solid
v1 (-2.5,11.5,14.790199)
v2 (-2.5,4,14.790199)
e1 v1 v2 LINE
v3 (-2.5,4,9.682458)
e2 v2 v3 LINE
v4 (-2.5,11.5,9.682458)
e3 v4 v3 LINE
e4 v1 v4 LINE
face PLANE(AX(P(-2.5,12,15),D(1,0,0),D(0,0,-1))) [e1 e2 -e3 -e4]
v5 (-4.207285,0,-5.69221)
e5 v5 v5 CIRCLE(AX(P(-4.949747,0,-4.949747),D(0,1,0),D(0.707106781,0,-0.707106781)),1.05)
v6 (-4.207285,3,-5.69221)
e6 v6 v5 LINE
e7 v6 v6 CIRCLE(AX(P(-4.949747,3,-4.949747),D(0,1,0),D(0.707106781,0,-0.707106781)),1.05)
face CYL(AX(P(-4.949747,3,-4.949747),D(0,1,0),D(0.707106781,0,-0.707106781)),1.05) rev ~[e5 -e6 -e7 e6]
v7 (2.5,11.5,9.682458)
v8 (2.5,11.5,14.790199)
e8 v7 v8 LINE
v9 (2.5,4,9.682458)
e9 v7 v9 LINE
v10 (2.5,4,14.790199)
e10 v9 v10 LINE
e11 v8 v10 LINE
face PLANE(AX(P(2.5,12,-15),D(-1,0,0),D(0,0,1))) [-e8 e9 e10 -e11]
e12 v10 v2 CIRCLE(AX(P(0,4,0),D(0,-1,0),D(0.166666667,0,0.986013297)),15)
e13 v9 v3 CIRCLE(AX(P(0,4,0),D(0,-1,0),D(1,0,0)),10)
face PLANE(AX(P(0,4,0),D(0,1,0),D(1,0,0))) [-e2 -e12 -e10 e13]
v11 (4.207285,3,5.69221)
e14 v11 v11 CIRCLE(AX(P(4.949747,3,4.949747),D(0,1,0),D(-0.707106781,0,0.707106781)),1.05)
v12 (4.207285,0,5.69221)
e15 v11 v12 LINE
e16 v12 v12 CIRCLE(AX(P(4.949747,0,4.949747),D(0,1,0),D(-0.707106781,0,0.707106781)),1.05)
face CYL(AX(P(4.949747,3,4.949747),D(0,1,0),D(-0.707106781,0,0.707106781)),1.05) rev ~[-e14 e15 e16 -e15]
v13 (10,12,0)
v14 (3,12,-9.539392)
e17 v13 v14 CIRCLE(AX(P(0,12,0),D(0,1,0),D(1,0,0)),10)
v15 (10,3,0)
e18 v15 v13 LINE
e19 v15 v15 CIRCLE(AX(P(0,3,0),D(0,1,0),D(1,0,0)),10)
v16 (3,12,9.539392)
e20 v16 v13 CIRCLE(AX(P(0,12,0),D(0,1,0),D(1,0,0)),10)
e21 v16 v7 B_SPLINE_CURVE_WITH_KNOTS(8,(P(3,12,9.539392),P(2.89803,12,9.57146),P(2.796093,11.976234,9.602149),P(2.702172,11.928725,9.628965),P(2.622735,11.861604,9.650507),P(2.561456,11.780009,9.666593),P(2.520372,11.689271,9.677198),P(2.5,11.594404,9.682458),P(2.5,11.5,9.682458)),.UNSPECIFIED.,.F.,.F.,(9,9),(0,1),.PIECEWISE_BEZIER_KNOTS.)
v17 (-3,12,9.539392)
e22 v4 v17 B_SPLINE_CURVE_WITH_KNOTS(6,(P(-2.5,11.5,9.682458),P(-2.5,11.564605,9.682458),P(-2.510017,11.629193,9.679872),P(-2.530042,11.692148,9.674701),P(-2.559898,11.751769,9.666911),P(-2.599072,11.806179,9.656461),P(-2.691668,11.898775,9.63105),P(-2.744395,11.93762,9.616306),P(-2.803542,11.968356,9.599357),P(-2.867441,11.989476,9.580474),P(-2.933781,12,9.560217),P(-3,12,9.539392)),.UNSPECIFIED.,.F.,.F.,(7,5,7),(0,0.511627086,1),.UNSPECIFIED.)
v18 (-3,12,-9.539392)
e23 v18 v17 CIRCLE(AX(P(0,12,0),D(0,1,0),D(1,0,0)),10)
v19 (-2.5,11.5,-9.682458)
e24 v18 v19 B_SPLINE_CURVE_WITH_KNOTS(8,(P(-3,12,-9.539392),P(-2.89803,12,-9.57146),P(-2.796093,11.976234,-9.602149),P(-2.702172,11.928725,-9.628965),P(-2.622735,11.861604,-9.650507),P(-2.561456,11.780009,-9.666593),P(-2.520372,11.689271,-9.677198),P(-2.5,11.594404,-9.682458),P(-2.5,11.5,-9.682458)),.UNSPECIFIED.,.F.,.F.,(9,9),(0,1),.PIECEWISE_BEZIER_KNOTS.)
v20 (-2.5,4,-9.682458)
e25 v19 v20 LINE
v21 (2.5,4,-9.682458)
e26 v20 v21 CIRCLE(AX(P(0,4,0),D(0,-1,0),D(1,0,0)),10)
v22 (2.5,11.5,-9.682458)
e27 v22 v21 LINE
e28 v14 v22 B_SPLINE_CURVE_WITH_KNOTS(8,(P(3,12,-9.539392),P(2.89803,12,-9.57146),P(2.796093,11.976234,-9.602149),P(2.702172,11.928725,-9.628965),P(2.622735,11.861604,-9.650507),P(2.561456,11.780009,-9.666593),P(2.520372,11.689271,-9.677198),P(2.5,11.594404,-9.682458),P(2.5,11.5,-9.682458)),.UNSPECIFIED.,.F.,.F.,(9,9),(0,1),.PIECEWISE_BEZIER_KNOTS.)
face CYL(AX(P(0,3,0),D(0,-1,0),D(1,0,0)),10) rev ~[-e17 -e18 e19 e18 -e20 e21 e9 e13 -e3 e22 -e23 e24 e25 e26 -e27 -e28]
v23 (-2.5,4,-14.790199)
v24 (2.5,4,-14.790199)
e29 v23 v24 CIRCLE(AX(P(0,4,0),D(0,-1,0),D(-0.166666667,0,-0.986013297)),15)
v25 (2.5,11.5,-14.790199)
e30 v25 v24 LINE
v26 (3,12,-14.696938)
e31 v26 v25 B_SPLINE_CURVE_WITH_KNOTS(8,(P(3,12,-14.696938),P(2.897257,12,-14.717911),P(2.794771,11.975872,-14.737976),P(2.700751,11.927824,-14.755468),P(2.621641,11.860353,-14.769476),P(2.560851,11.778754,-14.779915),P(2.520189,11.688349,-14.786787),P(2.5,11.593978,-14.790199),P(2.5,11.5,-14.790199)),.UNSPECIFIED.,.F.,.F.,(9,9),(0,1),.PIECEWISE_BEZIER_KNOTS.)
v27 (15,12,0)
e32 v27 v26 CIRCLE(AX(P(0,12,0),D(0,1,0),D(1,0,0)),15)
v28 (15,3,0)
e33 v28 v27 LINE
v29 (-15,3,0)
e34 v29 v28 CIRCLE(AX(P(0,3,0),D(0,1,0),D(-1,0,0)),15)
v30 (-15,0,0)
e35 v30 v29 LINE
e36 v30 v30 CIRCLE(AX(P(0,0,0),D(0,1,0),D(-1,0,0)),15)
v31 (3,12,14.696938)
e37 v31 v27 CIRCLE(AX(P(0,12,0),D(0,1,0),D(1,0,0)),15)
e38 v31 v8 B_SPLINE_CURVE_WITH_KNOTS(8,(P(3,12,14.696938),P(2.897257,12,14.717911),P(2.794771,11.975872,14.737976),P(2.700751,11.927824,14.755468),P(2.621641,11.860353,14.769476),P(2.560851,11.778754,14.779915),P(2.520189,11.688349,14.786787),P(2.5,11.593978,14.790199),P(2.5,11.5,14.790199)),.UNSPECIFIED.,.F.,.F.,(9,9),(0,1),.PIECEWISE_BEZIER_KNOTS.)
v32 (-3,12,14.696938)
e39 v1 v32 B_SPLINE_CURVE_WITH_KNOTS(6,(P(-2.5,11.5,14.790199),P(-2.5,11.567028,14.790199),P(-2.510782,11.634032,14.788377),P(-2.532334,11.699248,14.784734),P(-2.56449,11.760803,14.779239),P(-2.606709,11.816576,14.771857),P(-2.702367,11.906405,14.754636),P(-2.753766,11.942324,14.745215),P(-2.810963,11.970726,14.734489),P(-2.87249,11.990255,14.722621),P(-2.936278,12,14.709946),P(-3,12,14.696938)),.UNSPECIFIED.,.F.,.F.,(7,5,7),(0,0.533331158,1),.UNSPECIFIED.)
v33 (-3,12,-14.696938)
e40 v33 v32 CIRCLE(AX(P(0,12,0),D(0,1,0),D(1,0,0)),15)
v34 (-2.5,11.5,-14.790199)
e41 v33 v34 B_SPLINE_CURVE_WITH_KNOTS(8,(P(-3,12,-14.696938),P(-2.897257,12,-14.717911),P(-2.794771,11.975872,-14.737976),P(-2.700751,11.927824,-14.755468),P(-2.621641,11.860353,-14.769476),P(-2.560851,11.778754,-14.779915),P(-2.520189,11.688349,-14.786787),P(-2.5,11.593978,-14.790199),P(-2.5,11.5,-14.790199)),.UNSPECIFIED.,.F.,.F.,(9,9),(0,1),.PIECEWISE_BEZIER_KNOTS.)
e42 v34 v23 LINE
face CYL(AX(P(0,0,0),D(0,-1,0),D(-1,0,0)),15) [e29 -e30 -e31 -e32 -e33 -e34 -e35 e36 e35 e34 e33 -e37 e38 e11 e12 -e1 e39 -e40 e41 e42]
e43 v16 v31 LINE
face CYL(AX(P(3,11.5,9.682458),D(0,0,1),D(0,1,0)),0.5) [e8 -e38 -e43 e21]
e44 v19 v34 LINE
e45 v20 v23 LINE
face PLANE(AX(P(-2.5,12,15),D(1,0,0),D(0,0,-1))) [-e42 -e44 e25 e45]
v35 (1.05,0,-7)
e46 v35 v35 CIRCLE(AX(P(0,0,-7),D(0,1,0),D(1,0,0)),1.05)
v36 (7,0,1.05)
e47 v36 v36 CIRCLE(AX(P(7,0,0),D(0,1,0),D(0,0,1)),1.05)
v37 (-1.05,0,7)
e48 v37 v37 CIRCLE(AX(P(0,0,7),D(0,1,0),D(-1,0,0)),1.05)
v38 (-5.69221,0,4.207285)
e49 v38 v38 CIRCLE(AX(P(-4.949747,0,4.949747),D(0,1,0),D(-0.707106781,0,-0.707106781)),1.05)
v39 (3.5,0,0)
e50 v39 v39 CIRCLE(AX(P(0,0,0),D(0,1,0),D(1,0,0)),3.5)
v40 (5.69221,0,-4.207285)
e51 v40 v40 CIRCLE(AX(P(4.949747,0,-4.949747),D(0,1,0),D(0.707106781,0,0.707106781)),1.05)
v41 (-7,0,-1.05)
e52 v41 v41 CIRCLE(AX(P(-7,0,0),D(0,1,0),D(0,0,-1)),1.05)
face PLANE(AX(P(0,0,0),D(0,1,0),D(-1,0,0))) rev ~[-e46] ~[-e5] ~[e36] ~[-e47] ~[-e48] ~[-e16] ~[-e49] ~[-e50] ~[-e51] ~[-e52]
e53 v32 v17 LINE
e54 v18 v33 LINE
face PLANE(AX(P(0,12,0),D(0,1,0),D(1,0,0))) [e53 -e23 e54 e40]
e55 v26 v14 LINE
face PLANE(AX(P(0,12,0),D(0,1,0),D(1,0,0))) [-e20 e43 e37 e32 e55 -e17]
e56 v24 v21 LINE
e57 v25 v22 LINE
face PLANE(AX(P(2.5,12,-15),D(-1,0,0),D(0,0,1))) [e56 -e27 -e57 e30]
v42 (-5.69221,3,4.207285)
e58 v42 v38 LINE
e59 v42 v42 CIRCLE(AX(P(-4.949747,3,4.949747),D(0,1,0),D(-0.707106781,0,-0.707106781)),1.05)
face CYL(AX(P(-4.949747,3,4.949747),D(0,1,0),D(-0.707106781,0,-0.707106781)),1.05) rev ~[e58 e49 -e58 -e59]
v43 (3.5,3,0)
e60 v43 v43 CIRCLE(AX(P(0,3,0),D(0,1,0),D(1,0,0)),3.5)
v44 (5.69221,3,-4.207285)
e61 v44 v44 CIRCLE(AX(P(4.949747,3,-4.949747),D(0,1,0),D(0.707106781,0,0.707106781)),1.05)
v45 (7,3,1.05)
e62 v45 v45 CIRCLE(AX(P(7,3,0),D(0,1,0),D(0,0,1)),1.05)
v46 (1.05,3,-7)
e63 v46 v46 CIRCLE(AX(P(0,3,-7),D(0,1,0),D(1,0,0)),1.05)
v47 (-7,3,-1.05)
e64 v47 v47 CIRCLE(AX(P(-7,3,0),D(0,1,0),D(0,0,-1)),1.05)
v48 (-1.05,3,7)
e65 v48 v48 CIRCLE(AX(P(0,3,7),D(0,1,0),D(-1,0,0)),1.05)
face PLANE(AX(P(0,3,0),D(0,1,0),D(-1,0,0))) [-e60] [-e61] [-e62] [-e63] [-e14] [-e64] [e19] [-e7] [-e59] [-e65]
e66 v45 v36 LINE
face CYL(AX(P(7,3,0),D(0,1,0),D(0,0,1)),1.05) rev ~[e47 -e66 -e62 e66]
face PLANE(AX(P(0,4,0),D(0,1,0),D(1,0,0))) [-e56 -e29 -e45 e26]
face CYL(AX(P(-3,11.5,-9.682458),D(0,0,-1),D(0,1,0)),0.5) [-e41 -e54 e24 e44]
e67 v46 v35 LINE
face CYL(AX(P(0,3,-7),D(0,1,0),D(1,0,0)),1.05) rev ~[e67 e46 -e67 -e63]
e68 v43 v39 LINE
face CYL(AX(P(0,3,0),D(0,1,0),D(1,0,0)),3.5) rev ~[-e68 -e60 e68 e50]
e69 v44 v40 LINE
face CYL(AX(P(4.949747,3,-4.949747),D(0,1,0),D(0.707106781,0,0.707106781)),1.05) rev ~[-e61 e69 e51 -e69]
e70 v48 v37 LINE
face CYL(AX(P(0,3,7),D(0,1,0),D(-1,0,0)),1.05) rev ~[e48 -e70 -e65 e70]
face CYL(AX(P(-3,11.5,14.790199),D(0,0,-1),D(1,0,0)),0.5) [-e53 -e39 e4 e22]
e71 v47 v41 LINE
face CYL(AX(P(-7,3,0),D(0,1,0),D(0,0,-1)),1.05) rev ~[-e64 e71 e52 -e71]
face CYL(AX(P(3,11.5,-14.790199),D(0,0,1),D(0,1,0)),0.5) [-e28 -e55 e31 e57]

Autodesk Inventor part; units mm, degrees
ref_plane "YZ Plane" through (0, 0, 0) normal (1, 0, 0) x (0, 1, 0)
ref_plane "XZ Plane" through (0, 0, 0) normal (0, 1, 0) x (-1, 0, 0)
ref_plane "XY Plane" through (0, 0, 0) normal (0, 0, 1) x (1, 0, 0)
sketch "Sketch1" plane through (0, 0, 0) normal (0, 1, 0) x (-1, 0, 0)
  circle A0 centre (0, 0) radius 15
  dimension "d0" = 30
extrude "Extrusion1" add sketch "Sketch1" along normal blind 3
sketch "Sketch2" plane through (0, 3, 0) normal (0, 1, 0) x (1, 0, 0)
  circle A0 centre (0, 0) radius 15
  circle A1 centre (0, 0) radius 10
  dimension "d3" = 30
  dimension "d4" = 20
extrude "Extrusion2" add sketch "Sketch2" along normal blind 9
sketch "Sketch3" plane through (0, 12, 0) normal (0, 1, 0) x (1, 0, 0)
  line L0 (2.5, -15) -> (-2.5, -15)
  line L1 (-2.5, -15) -> (-2.5, 15)
  line L2 (-2.5, 15) -> (2.5, 15)
  line L3 (2.5, 15) -> (2.5, -15)
  line L4 (2.5, -15) -> (-2.5, 15) construction
  line L5 (-2.5, -15) -> (2.5, 15) construction
  point P0 (0, 0)
  dimension "d7" = 5
  dimension "d8" = 30
extrude "Extrusion3" cut sketch "Sketch3" against normal blind 8
fillet "Fillet1" radius 0.5 4 edges at (-2.5, 12, 12.2363) (-2.5, 12, -12.2363) (2.5, 12, 12.2363) (2.5, 12, -12.2363)
sketch "Sketch4" plane through (0, 3, 0) normal (0, 1, 0) x (1, 0, 0)
  circle A0 centre (0, 7) radius 1.05
  point P0 (0, 0)
  dimension "d12" = 2.1
  dimension "d13" = 7
extrude "Extrusion4" cut sketch "Sketch4" against normal through all
pattern_circular "Circular Pattern1" count 8 over 360 about axis through (0, -10, 0) along (0, 1, 0) of "Extrusion4"
sketch "Sketch5" plane through (0, 3, 0) normal (0, 1, 0) x (1, 0, 0)
  circle A0 centre (0, 0) radius 3.5
  dimension "d19" = 7
extrude "Extrusion5" cut sketch "Sketch5" against normal blind 10
properties part number "nozzle_motor_bracket"
